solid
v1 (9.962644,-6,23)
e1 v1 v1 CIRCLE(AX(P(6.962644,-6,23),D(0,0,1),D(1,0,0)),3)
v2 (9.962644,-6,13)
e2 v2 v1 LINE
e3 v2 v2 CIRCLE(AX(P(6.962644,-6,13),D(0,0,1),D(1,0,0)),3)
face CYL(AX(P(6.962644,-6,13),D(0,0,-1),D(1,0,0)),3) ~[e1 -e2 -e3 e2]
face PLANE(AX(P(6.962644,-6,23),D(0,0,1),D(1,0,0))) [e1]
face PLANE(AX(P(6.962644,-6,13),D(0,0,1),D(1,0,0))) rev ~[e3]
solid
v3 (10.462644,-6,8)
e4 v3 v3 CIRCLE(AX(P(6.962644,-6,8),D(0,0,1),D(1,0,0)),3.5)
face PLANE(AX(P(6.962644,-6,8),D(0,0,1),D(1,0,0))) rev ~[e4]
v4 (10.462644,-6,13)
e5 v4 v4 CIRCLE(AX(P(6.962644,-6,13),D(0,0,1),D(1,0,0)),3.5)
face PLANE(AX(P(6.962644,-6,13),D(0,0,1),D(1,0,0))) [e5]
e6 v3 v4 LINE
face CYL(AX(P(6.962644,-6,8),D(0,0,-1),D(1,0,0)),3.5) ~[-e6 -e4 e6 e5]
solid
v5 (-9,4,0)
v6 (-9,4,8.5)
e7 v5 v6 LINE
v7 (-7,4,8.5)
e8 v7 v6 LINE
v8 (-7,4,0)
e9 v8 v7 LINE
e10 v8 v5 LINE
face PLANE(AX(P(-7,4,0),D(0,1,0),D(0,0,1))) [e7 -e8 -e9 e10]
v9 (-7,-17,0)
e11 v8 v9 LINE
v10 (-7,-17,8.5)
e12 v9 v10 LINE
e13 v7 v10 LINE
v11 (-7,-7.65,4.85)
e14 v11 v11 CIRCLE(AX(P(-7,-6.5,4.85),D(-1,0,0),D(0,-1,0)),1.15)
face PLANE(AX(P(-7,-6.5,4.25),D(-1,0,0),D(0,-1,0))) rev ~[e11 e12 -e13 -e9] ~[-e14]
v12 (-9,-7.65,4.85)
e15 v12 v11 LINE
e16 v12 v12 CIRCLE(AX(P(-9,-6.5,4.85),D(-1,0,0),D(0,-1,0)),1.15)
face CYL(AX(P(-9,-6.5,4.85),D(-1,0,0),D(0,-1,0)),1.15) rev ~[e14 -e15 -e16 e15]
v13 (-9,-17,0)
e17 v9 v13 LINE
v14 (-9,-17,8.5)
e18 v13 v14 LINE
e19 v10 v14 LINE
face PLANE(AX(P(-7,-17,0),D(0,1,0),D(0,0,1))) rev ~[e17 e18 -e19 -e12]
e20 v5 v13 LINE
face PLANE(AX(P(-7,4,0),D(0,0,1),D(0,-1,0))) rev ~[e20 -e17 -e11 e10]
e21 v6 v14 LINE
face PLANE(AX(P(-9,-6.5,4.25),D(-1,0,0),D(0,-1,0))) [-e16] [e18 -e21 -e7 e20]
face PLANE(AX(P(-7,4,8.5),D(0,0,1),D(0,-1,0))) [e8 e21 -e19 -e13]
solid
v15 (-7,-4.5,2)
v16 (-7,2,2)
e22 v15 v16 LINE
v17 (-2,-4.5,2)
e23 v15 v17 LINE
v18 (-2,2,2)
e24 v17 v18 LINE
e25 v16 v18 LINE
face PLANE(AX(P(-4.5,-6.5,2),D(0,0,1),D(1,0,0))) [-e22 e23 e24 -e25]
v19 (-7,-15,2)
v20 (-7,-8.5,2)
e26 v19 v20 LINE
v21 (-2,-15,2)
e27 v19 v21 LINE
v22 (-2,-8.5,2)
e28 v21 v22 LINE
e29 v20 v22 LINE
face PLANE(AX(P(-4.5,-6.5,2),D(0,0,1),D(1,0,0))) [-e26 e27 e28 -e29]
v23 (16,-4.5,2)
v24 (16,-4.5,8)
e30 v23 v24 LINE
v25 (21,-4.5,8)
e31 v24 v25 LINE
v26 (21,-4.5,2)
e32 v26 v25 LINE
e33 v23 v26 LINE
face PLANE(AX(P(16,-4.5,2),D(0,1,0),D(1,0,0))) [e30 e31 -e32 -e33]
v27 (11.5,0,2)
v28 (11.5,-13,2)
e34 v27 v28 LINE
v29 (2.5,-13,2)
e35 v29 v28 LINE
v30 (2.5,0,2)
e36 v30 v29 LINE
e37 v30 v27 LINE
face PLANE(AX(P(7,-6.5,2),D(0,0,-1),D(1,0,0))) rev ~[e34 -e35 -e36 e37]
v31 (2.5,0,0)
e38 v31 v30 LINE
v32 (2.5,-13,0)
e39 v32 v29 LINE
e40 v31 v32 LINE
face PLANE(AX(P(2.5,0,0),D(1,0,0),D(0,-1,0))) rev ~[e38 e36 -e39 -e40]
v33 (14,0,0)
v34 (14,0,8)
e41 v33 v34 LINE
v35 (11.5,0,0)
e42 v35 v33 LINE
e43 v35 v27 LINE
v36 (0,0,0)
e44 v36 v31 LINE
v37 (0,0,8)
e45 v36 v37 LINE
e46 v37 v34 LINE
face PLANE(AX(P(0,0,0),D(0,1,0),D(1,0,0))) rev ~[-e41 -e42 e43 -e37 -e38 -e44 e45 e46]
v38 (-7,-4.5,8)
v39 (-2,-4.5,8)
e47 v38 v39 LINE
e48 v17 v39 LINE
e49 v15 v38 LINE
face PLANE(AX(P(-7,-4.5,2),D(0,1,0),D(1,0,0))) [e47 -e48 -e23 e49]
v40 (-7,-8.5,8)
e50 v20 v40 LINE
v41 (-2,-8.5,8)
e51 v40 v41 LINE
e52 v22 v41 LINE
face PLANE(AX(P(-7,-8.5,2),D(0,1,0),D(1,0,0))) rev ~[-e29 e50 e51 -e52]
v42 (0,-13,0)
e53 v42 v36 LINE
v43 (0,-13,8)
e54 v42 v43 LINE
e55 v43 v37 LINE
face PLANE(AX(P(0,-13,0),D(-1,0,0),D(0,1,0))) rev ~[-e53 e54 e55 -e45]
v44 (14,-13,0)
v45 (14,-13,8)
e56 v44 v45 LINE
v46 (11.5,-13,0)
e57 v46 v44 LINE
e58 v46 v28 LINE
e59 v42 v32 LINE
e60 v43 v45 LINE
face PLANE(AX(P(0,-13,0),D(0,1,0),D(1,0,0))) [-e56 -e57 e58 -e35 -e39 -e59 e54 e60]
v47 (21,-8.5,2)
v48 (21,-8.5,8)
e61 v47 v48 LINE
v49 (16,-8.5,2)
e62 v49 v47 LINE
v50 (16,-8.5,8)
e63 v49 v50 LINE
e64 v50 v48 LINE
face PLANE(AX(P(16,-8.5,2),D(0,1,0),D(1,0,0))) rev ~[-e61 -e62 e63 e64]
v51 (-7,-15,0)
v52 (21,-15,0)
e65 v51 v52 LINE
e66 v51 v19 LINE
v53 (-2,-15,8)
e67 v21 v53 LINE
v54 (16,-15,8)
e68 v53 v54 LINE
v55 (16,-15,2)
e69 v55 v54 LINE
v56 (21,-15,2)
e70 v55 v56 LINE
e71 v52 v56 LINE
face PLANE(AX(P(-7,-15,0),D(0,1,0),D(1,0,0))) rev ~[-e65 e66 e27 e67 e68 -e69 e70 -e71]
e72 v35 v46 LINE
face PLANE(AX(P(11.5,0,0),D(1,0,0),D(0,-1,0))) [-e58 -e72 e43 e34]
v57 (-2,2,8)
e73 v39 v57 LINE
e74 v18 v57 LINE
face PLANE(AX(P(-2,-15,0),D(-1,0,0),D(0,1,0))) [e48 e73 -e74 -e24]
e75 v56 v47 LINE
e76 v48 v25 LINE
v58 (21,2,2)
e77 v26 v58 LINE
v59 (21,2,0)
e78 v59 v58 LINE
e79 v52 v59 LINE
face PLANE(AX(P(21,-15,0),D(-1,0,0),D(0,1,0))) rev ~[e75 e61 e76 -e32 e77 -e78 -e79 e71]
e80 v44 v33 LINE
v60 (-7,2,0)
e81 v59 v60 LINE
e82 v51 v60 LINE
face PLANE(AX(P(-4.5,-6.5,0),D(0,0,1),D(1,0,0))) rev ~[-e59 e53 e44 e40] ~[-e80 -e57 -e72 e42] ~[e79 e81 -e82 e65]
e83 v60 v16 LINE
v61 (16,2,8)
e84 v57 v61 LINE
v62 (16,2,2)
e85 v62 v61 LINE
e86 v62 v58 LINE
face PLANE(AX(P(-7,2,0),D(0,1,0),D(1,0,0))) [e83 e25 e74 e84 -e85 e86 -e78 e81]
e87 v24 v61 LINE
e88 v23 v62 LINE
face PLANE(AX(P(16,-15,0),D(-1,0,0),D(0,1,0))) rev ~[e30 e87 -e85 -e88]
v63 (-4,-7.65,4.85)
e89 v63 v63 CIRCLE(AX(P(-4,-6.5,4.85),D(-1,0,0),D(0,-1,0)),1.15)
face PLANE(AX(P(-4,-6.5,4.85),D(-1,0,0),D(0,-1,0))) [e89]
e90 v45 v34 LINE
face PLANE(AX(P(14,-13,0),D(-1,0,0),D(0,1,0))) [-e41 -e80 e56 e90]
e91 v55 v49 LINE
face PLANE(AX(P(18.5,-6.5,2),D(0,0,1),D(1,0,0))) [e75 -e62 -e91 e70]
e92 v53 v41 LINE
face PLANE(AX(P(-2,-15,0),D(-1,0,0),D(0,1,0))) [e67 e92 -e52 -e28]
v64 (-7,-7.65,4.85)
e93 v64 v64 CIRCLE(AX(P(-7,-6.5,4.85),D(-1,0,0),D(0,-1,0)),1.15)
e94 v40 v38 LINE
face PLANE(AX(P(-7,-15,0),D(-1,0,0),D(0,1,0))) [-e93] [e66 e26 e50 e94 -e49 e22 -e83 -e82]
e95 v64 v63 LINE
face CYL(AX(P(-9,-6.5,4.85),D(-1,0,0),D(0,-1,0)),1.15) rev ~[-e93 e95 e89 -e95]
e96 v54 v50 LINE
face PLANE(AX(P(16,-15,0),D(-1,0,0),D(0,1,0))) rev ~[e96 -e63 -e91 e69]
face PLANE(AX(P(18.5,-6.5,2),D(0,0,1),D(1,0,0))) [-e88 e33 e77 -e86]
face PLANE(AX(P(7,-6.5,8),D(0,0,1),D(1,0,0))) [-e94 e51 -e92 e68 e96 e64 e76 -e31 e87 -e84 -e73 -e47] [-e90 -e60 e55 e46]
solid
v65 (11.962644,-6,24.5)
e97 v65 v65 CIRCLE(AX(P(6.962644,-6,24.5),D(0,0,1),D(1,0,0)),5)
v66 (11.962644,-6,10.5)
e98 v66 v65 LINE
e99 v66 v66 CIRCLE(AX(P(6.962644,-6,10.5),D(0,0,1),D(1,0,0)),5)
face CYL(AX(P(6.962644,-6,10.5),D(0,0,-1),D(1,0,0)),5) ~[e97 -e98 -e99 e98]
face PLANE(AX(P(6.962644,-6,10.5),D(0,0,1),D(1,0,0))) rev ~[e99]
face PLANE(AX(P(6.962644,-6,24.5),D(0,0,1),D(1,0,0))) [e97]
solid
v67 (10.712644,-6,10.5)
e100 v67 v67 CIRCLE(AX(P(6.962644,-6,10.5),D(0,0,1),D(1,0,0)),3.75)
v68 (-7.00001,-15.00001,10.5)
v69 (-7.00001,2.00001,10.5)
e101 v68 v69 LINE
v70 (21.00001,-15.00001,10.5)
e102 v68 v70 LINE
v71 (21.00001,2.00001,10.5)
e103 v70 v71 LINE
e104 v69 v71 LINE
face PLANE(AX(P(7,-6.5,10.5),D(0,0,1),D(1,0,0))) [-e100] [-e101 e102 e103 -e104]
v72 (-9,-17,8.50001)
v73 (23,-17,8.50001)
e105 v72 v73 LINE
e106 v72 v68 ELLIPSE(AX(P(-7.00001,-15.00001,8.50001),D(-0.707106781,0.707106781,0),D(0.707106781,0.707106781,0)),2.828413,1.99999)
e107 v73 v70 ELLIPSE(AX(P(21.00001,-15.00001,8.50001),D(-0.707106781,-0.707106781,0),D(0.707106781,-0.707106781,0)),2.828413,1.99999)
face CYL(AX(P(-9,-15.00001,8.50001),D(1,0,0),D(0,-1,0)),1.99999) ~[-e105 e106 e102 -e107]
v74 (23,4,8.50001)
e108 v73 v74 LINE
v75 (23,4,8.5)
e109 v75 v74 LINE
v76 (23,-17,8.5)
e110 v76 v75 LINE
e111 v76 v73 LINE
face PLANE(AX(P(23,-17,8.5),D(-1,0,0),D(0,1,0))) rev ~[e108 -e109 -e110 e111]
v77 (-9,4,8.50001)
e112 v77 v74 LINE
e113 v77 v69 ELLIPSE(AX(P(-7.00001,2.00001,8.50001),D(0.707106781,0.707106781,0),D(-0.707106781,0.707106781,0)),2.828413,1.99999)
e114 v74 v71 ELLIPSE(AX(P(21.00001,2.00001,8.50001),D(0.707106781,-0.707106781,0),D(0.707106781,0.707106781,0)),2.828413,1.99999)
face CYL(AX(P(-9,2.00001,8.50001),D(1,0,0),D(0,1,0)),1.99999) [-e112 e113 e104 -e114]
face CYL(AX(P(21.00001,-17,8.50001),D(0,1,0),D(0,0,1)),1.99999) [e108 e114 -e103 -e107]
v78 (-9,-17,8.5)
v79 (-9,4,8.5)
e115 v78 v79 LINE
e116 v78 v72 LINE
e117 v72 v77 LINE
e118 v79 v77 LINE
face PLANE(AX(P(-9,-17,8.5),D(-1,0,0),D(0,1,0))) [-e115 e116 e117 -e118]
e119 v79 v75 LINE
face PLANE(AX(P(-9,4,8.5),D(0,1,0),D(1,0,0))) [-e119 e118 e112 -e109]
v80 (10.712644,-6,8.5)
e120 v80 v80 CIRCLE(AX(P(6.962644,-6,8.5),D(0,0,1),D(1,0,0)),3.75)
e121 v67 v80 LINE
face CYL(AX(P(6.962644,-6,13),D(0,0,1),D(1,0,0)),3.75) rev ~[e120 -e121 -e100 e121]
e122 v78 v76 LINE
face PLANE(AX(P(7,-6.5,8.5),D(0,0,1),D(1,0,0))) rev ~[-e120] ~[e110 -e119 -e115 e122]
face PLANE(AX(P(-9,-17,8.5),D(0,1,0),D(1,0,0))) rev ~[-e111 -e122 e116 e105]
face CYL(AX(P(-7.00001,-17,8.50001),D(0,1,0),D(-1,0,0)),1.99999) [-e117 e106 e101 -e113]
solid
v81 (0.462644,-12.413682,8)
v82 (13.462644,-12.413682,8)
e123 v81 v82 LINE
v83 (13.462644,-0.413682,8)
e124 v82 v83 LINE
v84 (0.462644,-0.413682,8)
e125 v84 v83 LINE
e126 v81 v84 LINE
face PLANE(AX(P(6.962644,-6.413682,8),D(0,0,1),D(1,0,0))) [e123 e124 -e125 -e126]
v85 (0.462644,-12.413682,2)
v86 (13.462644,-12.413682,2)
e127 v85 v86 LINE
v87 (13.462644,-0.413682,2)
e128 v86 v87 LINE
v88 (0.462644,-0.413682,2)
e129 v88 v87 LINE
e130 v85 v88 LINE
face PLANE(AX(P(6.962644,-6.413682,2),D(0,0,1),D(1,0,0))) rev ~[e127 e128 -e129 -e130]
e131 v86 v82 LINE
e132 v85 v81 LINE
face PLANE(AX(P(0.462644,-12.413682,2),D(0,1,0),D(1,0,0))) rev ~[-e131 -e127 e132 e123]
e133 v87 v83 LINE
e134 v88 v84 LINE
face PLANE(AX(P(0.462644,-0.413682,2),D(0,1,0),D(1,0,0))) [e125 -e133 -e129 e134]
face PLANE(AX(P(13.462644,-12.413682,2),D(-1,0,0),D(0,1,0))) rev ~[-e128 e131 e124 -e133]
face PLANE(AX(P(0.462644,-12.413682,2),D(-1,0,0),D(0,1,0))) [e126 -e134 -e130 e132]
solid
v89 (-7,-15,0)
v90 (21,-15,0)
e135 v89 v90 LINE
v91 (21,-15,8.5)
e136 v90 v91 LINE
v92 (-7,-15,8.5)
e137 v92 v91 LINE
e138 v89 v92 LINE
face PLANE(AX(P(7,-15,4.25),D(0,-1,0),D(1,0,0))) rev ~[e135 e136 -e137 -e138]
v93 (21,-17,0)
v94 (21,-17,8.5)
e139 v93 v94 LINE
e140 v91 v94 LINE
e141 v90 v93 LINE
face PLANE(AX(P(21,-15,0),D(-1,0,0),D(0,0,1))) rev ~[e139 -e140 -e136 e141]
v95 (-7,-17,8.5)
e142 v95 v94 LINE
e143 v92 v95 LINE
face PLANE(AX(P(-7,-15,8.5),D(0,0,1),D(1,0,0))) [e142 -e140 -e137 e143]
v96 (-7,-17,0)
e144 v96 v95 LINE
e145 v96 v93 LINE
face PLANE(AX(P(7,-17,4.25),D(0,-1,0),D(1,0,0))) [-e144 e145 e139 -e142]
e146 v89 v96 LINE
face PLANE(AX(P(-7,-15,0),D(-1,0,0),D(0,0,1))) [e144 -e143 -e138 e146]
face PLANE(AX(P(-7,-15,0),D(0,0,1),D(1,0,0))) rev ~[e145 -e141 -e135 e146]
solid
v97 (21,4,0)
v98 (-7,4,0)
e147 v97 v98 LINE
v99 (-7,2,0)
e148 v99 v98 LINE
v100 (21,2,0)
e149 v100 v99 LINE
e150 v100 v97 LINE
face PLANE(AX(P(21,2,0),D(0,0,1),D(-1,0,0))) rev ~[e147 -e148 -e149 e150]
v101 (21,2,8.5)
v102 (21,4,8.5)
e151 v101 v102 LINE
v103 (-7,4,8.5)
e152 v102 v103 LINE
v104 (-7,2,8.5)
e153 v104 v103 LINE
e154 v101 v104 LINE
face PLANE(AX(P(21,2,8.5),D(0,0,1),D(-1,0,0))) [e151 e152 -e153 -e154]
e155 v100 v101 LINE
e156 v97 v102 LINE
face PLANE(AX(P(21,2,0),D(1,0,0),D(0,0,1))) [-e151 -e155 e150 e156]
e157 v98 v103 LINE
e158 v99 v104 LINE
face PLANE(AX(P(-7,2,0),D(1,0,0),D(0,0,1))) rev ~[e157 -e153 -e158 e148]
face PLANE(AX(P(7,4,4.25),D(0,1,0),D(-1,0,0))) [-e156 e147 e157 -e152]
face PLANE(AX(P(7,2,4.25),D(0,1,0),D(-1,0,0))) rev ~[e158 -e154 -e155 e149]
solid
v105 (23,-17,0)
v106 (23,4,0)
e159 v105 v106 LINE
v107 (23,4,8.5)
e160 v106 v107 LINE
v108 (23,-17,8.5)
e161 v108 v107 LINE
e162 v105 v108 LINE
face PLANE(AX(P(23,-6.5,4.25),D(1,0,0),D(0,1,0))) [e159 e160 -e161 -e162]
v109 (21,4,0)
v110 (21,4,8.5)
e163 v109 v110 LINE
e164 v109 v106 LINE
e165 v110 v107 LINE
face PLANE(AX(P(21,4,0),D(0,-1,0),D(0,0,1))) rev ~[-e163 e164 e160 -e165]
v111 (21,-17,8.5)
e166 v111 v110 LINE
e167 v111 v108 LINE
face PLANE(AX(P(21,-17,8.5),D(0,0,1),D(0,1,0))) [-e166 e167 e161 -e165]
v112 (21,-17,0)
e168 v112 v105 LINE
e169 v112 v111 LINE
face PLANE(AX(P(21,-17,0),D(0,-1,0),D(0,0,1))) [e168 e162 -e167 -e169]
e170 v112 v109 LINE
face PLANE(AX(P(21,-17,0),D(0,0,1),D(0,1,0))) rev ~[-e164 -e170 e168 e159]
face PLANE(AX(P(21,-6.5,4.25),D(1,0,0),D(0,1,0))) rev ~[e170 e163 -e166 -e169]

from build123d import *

# Parameters (mm, degrees)
F0_W      = 18
F0_H      = 17
F0_W_2    = 14
F0_H_2    = 13
F1_DEPTH  = 8
F2_W      = 9
F2_H      = 13
F3_DEPTH  = 2
F5_W      = 13
F5_H      = 12
F6_DEPTH  = 6
F7_R      = 3.5
F8_DEPTH  = 5
F9_R      = 3
F10_DEPTH = 10
F11_W     = 5
F11_H     = 17
F12_DEPTH = 2
F13_W     = 5
F13_H     = 4
F14_DEPTH = 6
F15_W     = 28
F15_H     = 8.5
F16_DEPTH = 2
F17_W     = 21
F17_H     = 8.5
F18_DEPTH = 2
F19_W     = 28
F19_H     = 8.5
F20_DEPTH = 2
F21_W     = 21
F21_H     = 8.5
F22_DEPTH = 2
F23_R     = 1.15
F24_DEPTH = 5
F25_W     = 32
F25_H     = 21
F26_DEPTH = 2
F27_R     = 3.75
F28_DEPTH = 5
F29_R     = 5
F30_DEPTH = 14
F31_R     = 1.99999


# Not quite as in the source:
# - a fillet or chamfer is up to 0.001 mm smaller than in the source, because OpenCascade refuses the exact size


with BuildPart() as f1:
    # F0 (on Top) → F1 (new body)
    with BuildSketch(Plane.XY):
        with Locations((7, -6.5)):
            Rectangle(F0_W, F0_H)
        with Locations((7, -6.5)):
            Rectangle(F0_W_2, F0_H_2, mode=Mode.SUBTRACT)
    extrude(amount=F1_DEPTH)

    # F2 (on face) → F3 (join)
    with BuildSketch(Plane(origin=(0, 0, 0), x_dir=(1, 0, 0), z_dir=(0, 0, -1))):
        with Locations((7, 6.5)):
            Rectangle(F2_W, F2_H)
    extrude(amount=-F3_DEPTH)

    # F11 (on Top) → F12 (join)
    with BuildSketch(Plane.XY):
        with Locations((-4.5, -6.5)):
            Rectangle(F11_W, F11_H)
        with Locations((18.5, -6.5)):
            Rectangle(F11_W, F11_H)
    extrude(amount=F12_DEPTH)

    # F13 (on face) → F14 (join)
    with BuildSketch(Plane.XY.offset(2)):
        with Locations((-4.5, -6.5)):
            Rectangle(F13_W, F13_H)
        with Locations((18.5, -6.5)):
            Rectangle(F13_W, F13_H)
    extrude(amount=F14_DEPTH)


with BuildPart() as f6:
    # F5 (on face) → F6 (new body)
    with BuildSketch(Plane.XY.offset(2)):
        with Locations((6.9626439363, -6.4136818983)):
            Rectangle(F5_W, F5_H)
    extrude(amount=F6_DEPTH)


with BuildPart() as f8:
    # F7 (on face) → F8 (new body)
    with BuildSketch(Plane.XY.offset(8)):
        with Locations((6.9626439363, -6)):
            Circle(F7_R)
    extrude(amount=F8_DEPTH)


with BuildPart() as f10:
    # F9 (on face) → F10 (new body)
    with BuildSketch(Plane.XY.offset(13)):
        with Locations((6.9626439363, -6)):
            Circle(F9_R)
    extrude(amount=F10_DEPTH)


with BuildPart() as f16:
    # F15 (on face) → F16 (new body)
    with BuildSketch(Plane.XZ.offset(15)):
        with Locations((7, 4.25)):
            Rectangle(F15_W, F15_H)
    extrude(amount=F16_DEPTH)


with BuildPart() as f18:
    # F17 (on face) → F18 (new body)
    with BuildSketch(Plane.YZ.offset(21)):
        with Locations((-6.5, 4.25)):
            Rectangle(F17_W, F17_H)
    extrude(amount=F18_DEPTH)


with BuildPart() as f20:
    # F19 (on face) → F20 (new body)
    with BuildSketch(Plane(origin=(0, 2, 0), x_dir=(-1, 0, 0), z_dir=(0, 1, 0))):
        with Locations((-7, 4.25)):
            Rectangle(F19_W, F19_H)
    extrude(amount=F20_DEPTH)


with BuildPart() as f22:
    # F21 (on face) → F22 (new body)
    with BuildSketch(Plane(origin=(-7, 0, 0), x_dir=(0, -1, 0), z_dir=(-1, 0, 0))):
        with Locations((6.5, 4.25)):
            Rectangle(F21_W, F21_H)
    extrude(amount=F22_DEPTH)


with BuildPart() as f24_tool:
    # F23 (on face) → F24 (new body)
    with BuildSketch(Plane(origin=(-9, 0, 0), x_dir=(0, -1, 0), z_dir=(-1, 0, 0))):
        with Locations((6.5, 4.85)):
            Circle(F23_R)
    extrude(amount=-F24_DEPTH)


with BuildPart() as f1_1:
    add(f1.part)

    # F24: cut by f24_tool
    add(f24_tool.part, mode=Mode.SUBTRACT)


with BuildPart() as f22_1:
    add(f22.part)

    # F24: cut by f24_tool
    add(f24_tool.part, mode=Mode.SUBTRACT)


with BuildPart() as f26:
    # F25 (on face) → F26 (new body)
    with BuildSketch(Plane.XY.offset(8.5)):
        with Locations((7, -6.5)):
            Rectangle(F25_W, F25_H)
    extrude(amount=F26_DEPTH)

    # F27 (on face) → F28 (cut)
    with BuildSketch(Plane.XY.offset(13)):
        with Locations((6.9626439363, -6)):
            Circle(F27_R)
    extrude(amount=-F28_DEPTH, mode=Mode.SUBTRACT)

    # F31 (radius 2 in the source; OpenCascade refuses exactly that, so slightly less here)
    f31_edges = [f26.edges().sort_by_distance(p)[0] for p in [
        (-9, -6.5, 10.5),
        (7, 4, 10.5),
        (7, -17, 10.5),
        (23, -6.5, 10.5),
    ]]
    fillet(f31_edges, radius=F31_R)


with BuildPart() as f30:
    # F29 (on face) → F30 (new body)
    with BuildSketch(Plane.XY.offset(10.5)):
        with Locations((6.9626439363, -6)):
            Circle(F29_R)
    extrude(amount=F30_DEPTH)


solid = Compound([f6.part, f8.part, f10.part, f16.part, f18.part, f20.part, f1_1.part, f22_1.part, f26.part, f30.part])
